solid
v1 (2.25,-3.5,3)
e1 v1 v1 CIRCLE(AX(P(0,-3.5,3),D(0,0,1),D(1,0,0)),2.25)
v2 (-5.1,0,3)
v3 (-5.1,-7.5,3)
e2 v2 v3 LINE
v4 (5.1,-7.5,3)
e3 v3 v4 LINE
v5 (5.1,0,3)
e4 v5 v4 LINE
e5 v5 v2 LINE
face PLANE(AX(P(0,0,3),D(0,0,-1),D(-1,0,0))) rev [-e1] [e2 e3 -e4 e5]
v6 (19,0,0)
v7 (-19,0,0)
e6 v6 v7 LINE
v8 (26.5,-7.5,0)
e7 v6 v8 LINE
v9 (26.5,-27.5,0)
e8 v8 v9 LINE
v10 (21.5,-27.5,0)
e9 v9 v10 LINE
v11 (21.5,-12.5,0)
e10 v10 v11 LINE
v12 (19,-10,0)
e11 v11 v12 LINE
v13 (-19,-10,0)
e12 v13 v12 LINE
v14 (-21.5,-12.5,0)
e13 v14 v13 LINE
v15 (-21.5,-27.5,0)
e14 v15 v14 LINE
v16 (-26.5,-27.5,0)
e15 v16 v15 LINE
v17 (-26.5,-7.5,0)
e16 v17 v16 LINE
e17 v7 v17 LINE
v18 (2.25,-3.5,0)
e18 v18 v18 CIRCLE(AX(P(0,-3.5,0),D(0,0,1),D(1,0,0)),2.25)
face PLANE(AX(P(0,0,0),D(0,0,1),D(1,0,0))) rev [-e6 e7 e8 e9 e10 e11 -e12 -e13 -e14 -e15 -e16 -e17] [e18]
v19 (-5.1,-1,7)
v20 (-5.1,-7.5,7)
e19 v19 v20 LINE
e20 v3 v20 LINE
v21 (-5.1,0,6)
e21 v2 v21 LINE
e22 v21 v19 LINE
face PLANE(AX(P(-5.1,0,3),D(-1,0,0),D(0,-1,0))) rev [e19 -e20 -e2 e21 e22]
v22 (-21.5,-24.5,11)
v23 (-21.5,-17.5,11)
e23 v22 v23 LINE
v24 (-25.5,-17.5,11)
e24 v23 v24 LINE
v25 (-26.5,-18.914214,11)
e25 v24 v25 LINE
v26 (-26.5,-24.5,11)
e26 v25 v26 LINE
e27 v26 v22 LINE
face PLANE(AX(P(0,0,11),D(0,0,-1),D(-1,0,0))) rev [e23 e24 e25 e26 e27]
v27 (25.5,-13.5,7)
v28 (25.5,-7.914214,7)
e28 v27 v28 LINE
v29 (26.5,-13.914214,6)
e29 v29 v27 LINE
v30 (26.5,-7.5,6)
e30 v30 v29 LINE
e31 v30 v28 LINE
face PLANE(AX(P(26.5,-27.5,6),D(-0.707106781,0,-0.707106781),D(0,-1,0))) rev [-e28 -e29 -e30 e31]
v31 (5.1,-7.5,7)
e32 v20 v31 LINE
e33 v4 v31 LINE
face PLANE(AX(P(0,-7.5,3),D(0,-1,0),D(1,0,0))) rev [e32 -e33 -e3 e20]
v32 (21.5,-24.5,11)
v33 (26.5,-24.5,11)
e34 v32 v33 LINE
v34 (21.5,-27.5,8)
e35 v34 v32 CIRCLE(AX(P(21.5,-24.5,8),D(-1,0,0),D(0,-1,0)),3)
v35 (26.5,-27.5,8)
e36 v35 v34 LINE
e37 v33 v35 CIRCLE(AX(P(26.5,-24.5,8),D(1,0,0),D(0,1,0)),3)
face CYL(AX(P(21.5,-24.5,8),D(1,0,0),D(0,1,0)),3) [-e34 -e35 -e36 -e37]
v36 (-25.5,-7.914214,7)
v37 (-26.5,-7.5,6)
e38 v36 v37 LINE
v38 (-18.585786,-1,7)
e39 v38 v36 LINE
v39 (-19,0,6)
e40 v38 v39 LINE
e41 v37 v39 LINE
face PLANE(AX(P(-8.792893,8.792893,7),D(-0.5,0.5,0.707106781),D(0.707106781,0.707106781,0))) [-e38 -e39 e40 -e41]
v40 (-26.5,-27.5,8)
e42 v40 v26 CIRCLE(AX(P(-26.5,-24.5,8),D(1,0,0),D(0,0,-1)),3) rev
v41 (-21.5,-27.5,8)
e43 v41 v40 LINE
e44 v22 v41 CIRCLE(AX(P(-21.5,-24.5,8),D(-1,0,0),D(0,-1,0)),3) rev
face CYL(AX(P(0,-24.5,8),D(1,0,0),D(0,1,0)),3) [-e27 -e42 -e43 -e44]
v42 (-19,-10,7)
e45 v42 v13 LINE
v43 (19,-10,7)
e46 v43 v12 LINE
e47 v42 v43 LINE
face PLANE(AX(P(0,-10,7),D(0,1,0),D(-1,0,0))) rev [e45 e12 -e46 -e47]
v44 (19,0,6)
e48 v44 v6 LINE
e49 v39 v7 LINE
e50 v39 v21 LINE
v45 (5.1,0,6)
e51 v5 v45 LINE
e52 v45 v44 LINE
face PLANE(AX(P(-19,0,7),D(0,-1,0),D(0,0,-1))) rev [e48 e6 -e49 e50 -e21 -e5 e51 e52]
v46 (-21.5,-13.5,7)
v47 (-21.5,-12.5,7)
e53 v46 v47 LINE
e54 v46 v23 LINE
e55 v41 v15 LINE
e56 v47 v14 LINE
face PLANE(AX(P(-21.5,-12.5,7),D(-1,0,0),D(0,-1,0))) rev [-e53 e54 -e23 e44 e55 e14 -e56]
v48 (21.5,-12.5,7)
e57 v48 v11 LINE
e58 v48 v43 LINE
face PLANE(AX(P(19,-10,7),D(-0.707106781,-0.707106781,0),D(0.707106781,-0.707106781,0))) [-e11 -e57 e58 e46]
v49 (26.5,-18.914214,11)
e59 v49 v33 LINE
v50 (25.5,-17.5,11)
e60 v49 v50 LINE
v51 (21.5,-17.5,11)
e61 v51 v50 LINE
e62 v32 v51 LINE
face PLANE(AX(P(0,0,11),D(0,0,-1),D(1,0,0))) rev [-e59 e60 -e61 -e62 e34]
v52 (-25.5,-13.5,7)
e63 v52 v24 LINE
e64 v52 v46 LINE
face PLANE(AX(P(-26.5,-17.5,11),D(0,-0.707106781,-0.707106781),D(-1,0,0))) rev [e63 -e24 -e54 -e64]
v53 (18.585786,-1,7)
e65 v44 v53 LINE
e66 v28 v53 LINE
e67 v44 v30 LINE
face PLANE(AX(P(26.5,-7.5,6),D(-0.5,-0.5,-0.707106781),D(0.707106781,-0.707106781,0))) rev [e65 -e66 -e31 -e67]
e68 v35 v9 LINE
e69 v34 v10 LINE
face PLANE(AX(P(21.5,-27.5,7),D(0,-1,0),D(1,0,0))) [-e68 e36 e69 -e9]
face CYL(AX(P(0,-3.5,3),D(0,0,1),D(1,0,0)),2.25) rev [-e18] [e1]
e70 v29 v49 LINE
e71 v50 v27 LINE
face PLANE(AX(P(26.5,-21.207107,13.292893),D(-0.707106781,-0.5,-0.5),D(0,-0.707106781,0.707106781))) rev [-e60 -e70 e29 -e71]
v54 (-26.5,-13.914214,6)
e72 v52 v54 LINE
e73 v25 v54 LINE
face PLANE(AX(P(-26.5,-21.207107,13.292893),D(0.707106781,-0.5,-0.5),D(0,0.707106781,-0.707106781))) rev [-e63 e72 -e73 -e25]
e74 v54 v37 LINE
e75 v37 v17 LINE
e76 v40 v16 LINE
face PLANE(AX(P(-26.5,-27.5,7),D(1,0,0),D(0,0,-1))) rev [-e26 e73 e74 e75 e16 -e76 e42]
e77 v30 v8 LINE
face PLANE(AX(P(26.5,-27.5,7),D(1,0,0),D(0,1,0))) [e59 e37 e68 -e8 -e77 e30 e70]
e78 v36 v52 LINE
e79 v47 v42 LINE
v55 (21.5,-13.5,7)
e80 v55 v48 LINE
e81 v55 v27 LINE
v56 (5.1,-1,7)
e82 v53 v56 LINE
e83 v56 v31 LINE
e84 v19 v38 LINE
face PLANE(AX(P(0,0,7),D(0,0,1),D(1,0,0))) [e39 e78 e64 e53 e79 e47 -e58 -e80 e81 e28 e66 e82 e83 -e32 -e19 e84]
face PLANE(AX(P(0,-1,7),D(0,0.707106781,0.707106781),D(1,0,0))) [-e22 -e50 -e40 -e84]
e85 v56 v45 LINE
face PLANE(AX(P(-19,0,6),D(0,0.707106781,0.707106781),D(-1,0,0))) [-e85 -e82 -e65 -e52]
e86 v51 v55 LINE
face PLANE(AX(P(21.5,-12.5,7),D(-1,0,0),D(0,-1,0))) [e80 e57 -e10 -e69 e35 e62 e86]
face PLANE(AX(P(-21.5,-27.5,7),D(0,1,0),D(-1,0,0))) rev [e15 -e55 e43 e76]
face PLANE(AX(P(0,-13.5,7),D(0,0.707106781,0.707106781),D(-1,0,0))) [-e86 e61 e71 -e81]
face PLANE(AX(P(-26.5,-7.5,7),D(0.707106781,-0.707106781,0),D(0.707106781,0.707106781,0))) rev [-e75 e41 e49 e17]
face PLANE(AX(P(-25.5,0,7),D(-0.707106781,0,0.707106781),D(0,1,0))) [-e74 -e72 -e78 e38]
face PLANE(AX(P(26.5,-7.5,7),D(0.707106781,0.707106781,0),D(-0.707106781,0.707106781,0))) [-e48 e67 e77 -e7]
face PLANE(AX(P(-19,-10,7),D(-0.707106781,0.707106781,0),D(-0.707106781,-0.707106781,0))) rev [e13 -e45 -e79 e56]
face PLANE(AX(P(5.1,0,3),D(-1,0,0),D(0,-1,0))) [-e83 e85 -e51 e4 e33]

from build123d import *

# Parameters (mm, degrees)
BOSS_EXTRUDE1_DEPTH  = 7
SKETCH6_W            = 5
SKETCH6_H            = 10
BOSS_EXTRUDE2_DEPTH  = 4
SKETCH3_W            = 5.1
SKETCH3_H            = 7.5
CUT_EXTRUDE1_DEPTH   = 4
M4_CLEARANCE_HOLE1_D = 4.5
CHAMFER2_SIZE        = 4
FILLET2_R            = 3


# Some blends are built 0.0001 mm under size
with BuildPart() as part:
    # Sketch1 → Boss-Extrude1 (new body)
    with BuildSketch(Plane.XY):
        Polygon((0, 0), (0, -10), (-19, -10), (-21.5, -12.5), (-21.5, -27.5), (-26.5, -27.5), (-26.5, -7.5), (-19, 0), align=None)
    boss_extrude1 = extrude(amount=BOSS_EXTRUDE1_DEPTH)

    # Sketch6 → Boss-Extrude2 (add)
    with BuildSketch(Plane.XY.offset(7)):
        with Locations((-24, -22.5)):
            Rectangle(SKETCH6_W, SKETCH6_H)
    boss_extrude2 = extrude(amount=BOSS_EXTRUDE2_DEPTH)

    # Sketch3 → Cut-Extrude1 (cut)
    with BuildSketch(Plane.XY.offset(7)):
        with Locations((-2.55, -3.75)):
            Rectangle(SKETCH3_W, SKETCH3_H)
    cut_extrude1 = extrude(amount=-CUT_EXTRUDE1_DEPTH, mode=Mode.SUBTRACT)

    # Mirror1: Boss-Extrude1, Boss-Extrude2, Cut-Extrude1 across plane
    add(boss_extrude1.mirror(Plane(origin=(0, 0, 7), x_dir=(0, 0, 1), z_dir=(-1, 0, 0))))
    add(boss_extrude2.mirror(Plane(origin=(0, 0, 7), x_dir=(0, 0, 1), z_dir=(-1, 0, 0))))
    add(cut_extrude1.mirror(Plane(origin=(0, 0, 7), x_dir=(0, 0, 1), z_dir=(-1, 0, 0))), mode=Mode.SUBTRACT)

    # M4 Clearance Hole1 (through all)
    with Locations(Plane.XY.offset(3)):
        with Locations((0, -3.5)):
            Hole(M4_CLEARANCE_HOLE1_D / 2)

    # Chamfer2
    chamfer2_edges = [part.edges().sort_by_distance(p)[0] for p in [
        (-24, -17.5, 7),
        (24, -17.5, 7),
    ]]
    chamfer(chamfer2_edges, length=CHAMFER2_SIZE - 0.0001)  # a hair under: the kernel refuses the full size

    # Chamfer4
    # the kernel refuses this chamfer: 1 mm, written as the material it takes off along each edge
    with BuildSketch(Plane(origin=(26.5, -11.68164552, 5.18154552), x_dir=(-0.9996219169112968, 0.019442520806014118, 0.01944252080601436), z_dir=(0, -0.7071067811865476, 0.7071067811865476))) as chamfer4_piece_1_section:
        with BuildLine():
            Line((1.028673195, 0), (-0.056547155, 1.027117794))
            Line((-0.056547155, 1.027117794), (-0.076539593, 1.026567876))
            ThreePointArc((-0.076539593, 1.026567876), (-0.034129227, 0.51339783), (-0.019992438, -0.000549918))
            Line((-0.019992438, -0.000549918), (0.000549918, -0.019992438))
            ThreePointArc((0.000549918, -0.019992438), (0.514497665, -0.00585565), (1.029223113, -0.019992438))
            Line((1.029223113, -0.019992438), (1.028673195, 0))
        make_face()
    chamfer4_piece_1 = extrude(amount=10.800078804, mode=Mode.PRIVATE)
    chamfer4_piece_1 = split(chamfer4_piece_1, bisect_by=Plane(origin=(26.156619069, -15.715277747, 7), z_dir=(0, 0, 1)), keep=Keep.TOP, mode=Mode.PRIVATE)
    add(chamfer4_piece_1, mode=Mode.SUBTRACT)
    with BuildSketch(Plane(origin=(-26.5, -11.68164552, 5.18154552), x_dir=(0.9996219169112968, 0.019442520806013806, 0.019442520806013806), z_dir=(0, -0.7071067811865476, 0.7071067811865476))) as chamfer4_piece_2_section:
        with BuildLine():
            Line((1.028673195, 0), (-0.056547155, -1.027117794))
            Line((-0.056547155, -1.027117794), (-0.076539593, -1.026567876))
            ThreePointArc((-0.076539593, -1.026567876), (-0.034129227, -0.51339783), (-0.019992438, 0.000549918))
            Line((-0.019992438, 0.000549918), (0.000549918, 0.019992438))
            ThreePointArc((0.000549918, 0.019992438), (0.514497665, 0.00585565), (1.029223113, 0.019992438))
            Line((1.029223113, 0.019992438), (1.028673195, 0))
        make_face()
    chamfer4_piece_2 = extrude(amount=10.800078804, mode=Mode.PRIVATE)
    chamfer4_piece_2 = split(chamfer4_piece_2, bisect_by=Plane(origin=(-26.156619069, -15.715277747, 7), z_dir=(0, 0, 1)), keep=Keep.TOP, mode=Mode.PRIVATE)
    add(chamfer4_piece_2, mode=Mode.SUBTRACT)
    with BuildSketch(Plane(origin=(-28.31845448, -9.31845448, 7), x_dir=(0.7068394360706726, -0.7068394360706746, 0.027495876610586528), z_dir=(0.7071067811865485, 0.7071067811865466, 0))) as chamfer4_piece_3:
        with BuildLine():
            Line((1.028673195, 0), (-0.056547155, 1.027117794))
            Line((-0.056547155, 1.027117794), (-0.076539593, 1.026567876))
            ThreePointArc((-0.076539593, 1.026567876), (-0.034129227, 0.51339783), (-0.019992438, -0.000549918))
            Line((-0.019992438, -0.000549918), (0.000549918, -0.019992438))
            ThreePointArc((0.000549918, -0.019992438), (0.514497665, -0.00585565), (1.029223113, -0.019992438))
            Line((1.029223113, -0.019992438), (1.028673195, 0))
        make_face()
    extrude(amount=15.749967694, mode=Mode.SUBTRACT)
    with BuildSketch(Plane(origin=(-26.5, -16.071782988, 7), x_dir=(0.9996219169112968, 0, 0.02749587661058651), z_dir=(0, 1, 0))) as chamfer4_piece_4_section:
        with BuildLine():
            Line((1.028673195, 0), (-0.056547155, 1.027117794))
            Line((-0.056547155, 1.027117794), (-0.076539593, 1.026567876))
            ThreePointArc((-0.076539593, 1.026567876), (-0.034129227, 0.51339783), (-0.019992438, -0.000549918))
            Line((-0.019992438, -0.000549918), (0.000549918, -0.019992438))
            ThreePointArc((0.000549918, -0.019992438), (0.514497665, -0.00585565), (1.029223113, -0.019992438))
            Line((1.029223113, -0.019992438), (1.028673195, 0))
        make_face()
    chamfer4_piece_4 = extrude(amount=11.143465976, mode=Mode.PRIVATE)
    chamfer4_piece_4 = split(chamfer4_piece_4, bisect_by=Plane(origin=(-26.166087376, -11.115587602, 4.615487602), z_dir=(0, 0.7071067811865476, 0.7071067811865476)), keep=Keep.TOP, mode=Mode.PRIVATE)
    add(chamfer4_piece_4, mode=Mode.SUBTRACT)
    with BuildSketch(Plane(origin=(-21.571682988, 0, 7), x_dir=(0, -0.9996219169112968, 0.027495876610586494), z_dir=(1, 0, 0))) as chamfer4_piece_5:
        with BuildLine():
            Line((1.028673195, 0), (-0.056547155, 1.027117794))
            Line((-0.056547155, 1.027117794), (-0.076539593, 1.026567876))
            ThreePointArc((-0.076539593, 1.026567876), (-0.034129227, 0.51339783), (-0.019992438, -0.000549918))
            Line((-0.019992438, -0.000549918), (0.000549918, -0.019992438))
            ThreePointArc((0.000549918, -0.019992438), (0.514497665, -0.00585565), (1.029223113, -0.019992438))
            Line((1.029223113, -0.019992438), (1.028673195, 0))
        make_face()
    extrude(amount=19.043365976, mode=Mode.SUBTRACT)
    with BuildSketch(Plane(origin=(26.5, -16.071782988, 7), x_dir=(-0.9996219169112968, 0, 0.02749587661058651), z_dir=(0, 1, 0))) as chamfer4_piece_6_section:
        with BuildLine():
            Line((1.028673195, 0), (-0.056547155, -1.027117794))
            Line((-0.056547155, -1.027117794), (-0.076539593, -1.026567876))
            ThreePointArc((-0.076539593, -1.026567876), (-0.034129227, -0.51339783), (-0.019992438, 0.000549918))
            Line((-0.019992438, 0.000549918), (0.000549918, 0.019992438))
            ThreePointArc((0.000549918, 0.019992438), (0.514497665, 0.00585565), (1.029223113, 0.019992438))
            Line((1.029223113, 0.019992438), (1.028673195, 0))
        make_face()
    chamfer4_piece_6 = extrude(amount=11.143465976, mode=Mode.PRIVATE)
    chamfer4_piece_6 = split(chamfer4_piece_6, bisect_by=Plane(origin=(26.166087376, -11.115587602, 4.615487602), z_dir=(0, 0.7071067811865476, 0.7071067811865476)), keep=Keep.TOP, mode=Mode.PRIVATE)
    add(chamfer4_piece_6, mode=Mode.SUBTRACT)
    with BuildSketch(Plane(origin=(28.31845448, -9.31845448, 7), x_dir=(-0.7068394360706725, -0.7068394360706747, 0.027495876610586528), z_dir=(-0.7071067811865487, 0.7071067811865464, 0))) as chamfer4_piece_7:
        with BuildLine():
            Line((1.028673195, 0), (-0.056547155, -1.027117794))
            Line((-0.056547155, -1.027117794), (-0.076539593, -1.026567876))
            ThreePointArc((-0.076539593, -1.026567876), (-0.034129227, -0.51339783), (-0.019992438, 0.000549918))
            Line((-0.019992438, 0.000549918), (0.000549918, 0.019992438))
            ThreePointArc((0.000549918, 0.019992438), (0.514497665, 0.00585565), (1.029223113, 0.019992438))
            Line((1.029223113, 0.019992438), (1.028673195, 0))
        make_face()
    extrude(amount=15.749967694, mode=Mode.SUBTRACT)
    with BuildSketch(Plane(origin=(21.571682988, 0, 7), x_dir=(0, -0.9996219169112968, 0.027495876610586494), z_dir=(-1, 0, 0))) as chamfer4_piece_8:
        with BuildLine():
            Line((1.028673195, 0), (-0.056547155, -1.027117794))
            Line((-0.056547155, -1.027117794), (-0.076539593, -1.026567876))
            ThreePointArc((-0.076539593, -1.026567876), (-0.034129227, -0.51339783), (-0.019992438, 0.000549918))
            Line((-0.019992438, 0.000549918), (0.000549918, 0.019992438))
            ThreePointArc((0.000549918, 0.019992438), (0.514497665, 0.00585565), (1.029223113, 0.019992438))
            Line((1.029223113, 0.019992438), (1.028673195, 0))
        make_face()
    extrude(amount=19.043365976, mode=Mode.SUBTRACT)
    with BuildSketch(Plane(origin=(26.5, -16.071782988, 7), x_dir=(-0.9996219169112968, 0, 0.02749587661058651), z_dir=(0, 1, 0))) as chamfer4_piece_9a_section:
        with BuildLine():
            Line((1.028673195, 0), (-0.056547155, -1.027117794))
            Line((-0.056547155, -1.027117794), (-0.076539593, -1.026567876))
            ThreePointArc((-0.076539593, -1.026567876), (-0.034129227, -0.51339783), (-0.019992438, 0.000549918))
            Line((-0.019992438, 0.000549918), (0.000549918, 0.019992438))
            ThreePointArc((0.000549918, 0.019992438), (0.514497665, 0.00585565), (1.029223113, 0.019992438))
            Line((1.029223113, 0.019992438), (1.028673195, 0))
        make_face()
    chamfer4_piece_9a = extrude(amount=11.143465976, mode=Mode.PRIVATE)
    chamfer4_piece_9a = split(chamfer4_piece_9a, bisect_by=Plane(origin=(26.181906875, -13.879260813, 7.379160813), z_dir=(0, -0.7071067811865476, -0.7071067811865476)), keep=Keep.TOP, mode=Mode.PRIVATE)
    with BuildSketch(Plane(origin=(26.5, -11.68164552, 5.18154552), x_dir=(-0.9996219169112968, 0.019442520806014118, 0.01944252080601436), z_dir=(0, -0.7071067811865476, 0.7071067811865476))) as chamfer4_piece_9b_section:
        with BuildLine():
            Line((1.028673195, 0), (-0.056547155, 1.027117794))
            Line((-0.056547155, 1.027117794), (-0.076539593, 1.026567876))
            ThreePointArc((-0.076539593, 1.026567876), (-0.034129227, 0.51339783), (-0.019992438, -0.000549918))
            Line((-0.019992438, -0.000549918), (0.000549918, -0.019992438))
            ThreePointArc((0.000549918, -0.019992438), (0.514497665, -0.00585565), (1.029223113, -0.019992438))
            Line((1.029223113, -0.019992438), (1.028673195, 0))
        make_face()
    chamfer4_piece_9b = extrude(amount=10.800078804, mode=Mode.PRIVATE)
    chamfer4_piece_9b = split(chamfer4_piece_9b, bisect_by=Plane(origin=(26.181906875, -12.963885635, 7), z_dir=(0, 0, -1)), keep=Keep.TOP, mode=Mode.PRIVATE)
    chamfer4_piece_9 = chamfer4_piece_9a & chamfer4_piece_9b
    add(chamfer4_piece_9, mode=Mode.SUBTRACT)
    with BuildSketch(Plane(origin=(-26.5, -16.071782988, 7), x_dir=(0.9996219169112968, 0, 0.02749587661058651), z_dir=(0, 1, 0))) as chamfer4_piece_10a_section:
        with BuildLine():
            Line((1.028673195, 0), (-0.056547155, 1.027117794))
            Line((-0.056547155, 1.027117794), (-0.076539593, 1.026567876))
            ThreePointArc((-0.076539593, 1.026567876), (-0.034129227, 0.51339783), (-0.019992438, -0.000549918))
            Line((-0.019992438, -0.000549918), (0.000549918, -0.019992438))
            ThreePointArc((0.000549918, -0.019992438), (0.514497665, -0.00585565), (1.029223113, -0.019992438))
            Line((1.029223113, -0.019992438), (1.028673195, 0))
        make_face()
    chamfer4_piece_10a = extrude(amount=11.143465976, mode=Mode.PRIVATE)
    chamfer4_piece_10a = split(chamfer4_piece_10a, bisect_by=Plane(origin=(-26.181906875, -13.879260813, 7.379160813), z_dir=(0, -0.7071067811865476, -0.7071067811865476)), keep=Keep.TOP, mode=Mode.PRIVATE)
    with BuildSketch(Plane(origin=(-26.5, -11.68164552, 5.18154552), x_dir=(0.9996219169112968, 0.019442520806013806, 0.019442520806013806), z_dir=(0, -0.7071067811865476, 0.7071067811865476))) as chamfer4_piece_10b_section:
        with BuildLine():
            Line((1.028673195, 0), (-0.056547155, -1.027117794))
            Line((-0.056547155, -1.027117794), (-0.076539593, -1.026567876))
            ThreePointArc((-0.076539593, -1.026567876), (-0.034129227, -0.51339783), (-0.019992438, 0.000549918))
            Line((-0.019992438, 0.000549918), (0.000549918, 0.019992438))
            ThreePointArc((0.000549918, 0.019992438), (0.514497665, 0.00585565), (1.029223113, 0.019992438))
            Line((1.029223113, 0.019992438), (1.028673195, 0))
        make_face()
    chamfer4_piece_10b = extrude(amount=10.800078804, mode=Mode.PRIVATE)
    chamfer4_piece_10b = split(chamfer4_piece_10b, bisect_by=Plane(origin=(-26.181906875, -12.963885635, 7), z_dir=(0, 0, -1)), keep=Keep.TOP, mode=Mode.PRIVATE)
    chamfer4_piece_10 = chamfer4_piece_10a & chamfer4_piece_10b
    add(chamfer4_piece_10, mode=Mode.SUBTRACT)

    # Fillet2
    fillet2_edges = [part.edges().sort_by_distance(p)[0] for p in [
        (-24, -27.5, 11),
        (24, -27.5, 11),
    ]]
    fillet(fillet2_edges, radius=FILLET2_R)


solid = part.part
